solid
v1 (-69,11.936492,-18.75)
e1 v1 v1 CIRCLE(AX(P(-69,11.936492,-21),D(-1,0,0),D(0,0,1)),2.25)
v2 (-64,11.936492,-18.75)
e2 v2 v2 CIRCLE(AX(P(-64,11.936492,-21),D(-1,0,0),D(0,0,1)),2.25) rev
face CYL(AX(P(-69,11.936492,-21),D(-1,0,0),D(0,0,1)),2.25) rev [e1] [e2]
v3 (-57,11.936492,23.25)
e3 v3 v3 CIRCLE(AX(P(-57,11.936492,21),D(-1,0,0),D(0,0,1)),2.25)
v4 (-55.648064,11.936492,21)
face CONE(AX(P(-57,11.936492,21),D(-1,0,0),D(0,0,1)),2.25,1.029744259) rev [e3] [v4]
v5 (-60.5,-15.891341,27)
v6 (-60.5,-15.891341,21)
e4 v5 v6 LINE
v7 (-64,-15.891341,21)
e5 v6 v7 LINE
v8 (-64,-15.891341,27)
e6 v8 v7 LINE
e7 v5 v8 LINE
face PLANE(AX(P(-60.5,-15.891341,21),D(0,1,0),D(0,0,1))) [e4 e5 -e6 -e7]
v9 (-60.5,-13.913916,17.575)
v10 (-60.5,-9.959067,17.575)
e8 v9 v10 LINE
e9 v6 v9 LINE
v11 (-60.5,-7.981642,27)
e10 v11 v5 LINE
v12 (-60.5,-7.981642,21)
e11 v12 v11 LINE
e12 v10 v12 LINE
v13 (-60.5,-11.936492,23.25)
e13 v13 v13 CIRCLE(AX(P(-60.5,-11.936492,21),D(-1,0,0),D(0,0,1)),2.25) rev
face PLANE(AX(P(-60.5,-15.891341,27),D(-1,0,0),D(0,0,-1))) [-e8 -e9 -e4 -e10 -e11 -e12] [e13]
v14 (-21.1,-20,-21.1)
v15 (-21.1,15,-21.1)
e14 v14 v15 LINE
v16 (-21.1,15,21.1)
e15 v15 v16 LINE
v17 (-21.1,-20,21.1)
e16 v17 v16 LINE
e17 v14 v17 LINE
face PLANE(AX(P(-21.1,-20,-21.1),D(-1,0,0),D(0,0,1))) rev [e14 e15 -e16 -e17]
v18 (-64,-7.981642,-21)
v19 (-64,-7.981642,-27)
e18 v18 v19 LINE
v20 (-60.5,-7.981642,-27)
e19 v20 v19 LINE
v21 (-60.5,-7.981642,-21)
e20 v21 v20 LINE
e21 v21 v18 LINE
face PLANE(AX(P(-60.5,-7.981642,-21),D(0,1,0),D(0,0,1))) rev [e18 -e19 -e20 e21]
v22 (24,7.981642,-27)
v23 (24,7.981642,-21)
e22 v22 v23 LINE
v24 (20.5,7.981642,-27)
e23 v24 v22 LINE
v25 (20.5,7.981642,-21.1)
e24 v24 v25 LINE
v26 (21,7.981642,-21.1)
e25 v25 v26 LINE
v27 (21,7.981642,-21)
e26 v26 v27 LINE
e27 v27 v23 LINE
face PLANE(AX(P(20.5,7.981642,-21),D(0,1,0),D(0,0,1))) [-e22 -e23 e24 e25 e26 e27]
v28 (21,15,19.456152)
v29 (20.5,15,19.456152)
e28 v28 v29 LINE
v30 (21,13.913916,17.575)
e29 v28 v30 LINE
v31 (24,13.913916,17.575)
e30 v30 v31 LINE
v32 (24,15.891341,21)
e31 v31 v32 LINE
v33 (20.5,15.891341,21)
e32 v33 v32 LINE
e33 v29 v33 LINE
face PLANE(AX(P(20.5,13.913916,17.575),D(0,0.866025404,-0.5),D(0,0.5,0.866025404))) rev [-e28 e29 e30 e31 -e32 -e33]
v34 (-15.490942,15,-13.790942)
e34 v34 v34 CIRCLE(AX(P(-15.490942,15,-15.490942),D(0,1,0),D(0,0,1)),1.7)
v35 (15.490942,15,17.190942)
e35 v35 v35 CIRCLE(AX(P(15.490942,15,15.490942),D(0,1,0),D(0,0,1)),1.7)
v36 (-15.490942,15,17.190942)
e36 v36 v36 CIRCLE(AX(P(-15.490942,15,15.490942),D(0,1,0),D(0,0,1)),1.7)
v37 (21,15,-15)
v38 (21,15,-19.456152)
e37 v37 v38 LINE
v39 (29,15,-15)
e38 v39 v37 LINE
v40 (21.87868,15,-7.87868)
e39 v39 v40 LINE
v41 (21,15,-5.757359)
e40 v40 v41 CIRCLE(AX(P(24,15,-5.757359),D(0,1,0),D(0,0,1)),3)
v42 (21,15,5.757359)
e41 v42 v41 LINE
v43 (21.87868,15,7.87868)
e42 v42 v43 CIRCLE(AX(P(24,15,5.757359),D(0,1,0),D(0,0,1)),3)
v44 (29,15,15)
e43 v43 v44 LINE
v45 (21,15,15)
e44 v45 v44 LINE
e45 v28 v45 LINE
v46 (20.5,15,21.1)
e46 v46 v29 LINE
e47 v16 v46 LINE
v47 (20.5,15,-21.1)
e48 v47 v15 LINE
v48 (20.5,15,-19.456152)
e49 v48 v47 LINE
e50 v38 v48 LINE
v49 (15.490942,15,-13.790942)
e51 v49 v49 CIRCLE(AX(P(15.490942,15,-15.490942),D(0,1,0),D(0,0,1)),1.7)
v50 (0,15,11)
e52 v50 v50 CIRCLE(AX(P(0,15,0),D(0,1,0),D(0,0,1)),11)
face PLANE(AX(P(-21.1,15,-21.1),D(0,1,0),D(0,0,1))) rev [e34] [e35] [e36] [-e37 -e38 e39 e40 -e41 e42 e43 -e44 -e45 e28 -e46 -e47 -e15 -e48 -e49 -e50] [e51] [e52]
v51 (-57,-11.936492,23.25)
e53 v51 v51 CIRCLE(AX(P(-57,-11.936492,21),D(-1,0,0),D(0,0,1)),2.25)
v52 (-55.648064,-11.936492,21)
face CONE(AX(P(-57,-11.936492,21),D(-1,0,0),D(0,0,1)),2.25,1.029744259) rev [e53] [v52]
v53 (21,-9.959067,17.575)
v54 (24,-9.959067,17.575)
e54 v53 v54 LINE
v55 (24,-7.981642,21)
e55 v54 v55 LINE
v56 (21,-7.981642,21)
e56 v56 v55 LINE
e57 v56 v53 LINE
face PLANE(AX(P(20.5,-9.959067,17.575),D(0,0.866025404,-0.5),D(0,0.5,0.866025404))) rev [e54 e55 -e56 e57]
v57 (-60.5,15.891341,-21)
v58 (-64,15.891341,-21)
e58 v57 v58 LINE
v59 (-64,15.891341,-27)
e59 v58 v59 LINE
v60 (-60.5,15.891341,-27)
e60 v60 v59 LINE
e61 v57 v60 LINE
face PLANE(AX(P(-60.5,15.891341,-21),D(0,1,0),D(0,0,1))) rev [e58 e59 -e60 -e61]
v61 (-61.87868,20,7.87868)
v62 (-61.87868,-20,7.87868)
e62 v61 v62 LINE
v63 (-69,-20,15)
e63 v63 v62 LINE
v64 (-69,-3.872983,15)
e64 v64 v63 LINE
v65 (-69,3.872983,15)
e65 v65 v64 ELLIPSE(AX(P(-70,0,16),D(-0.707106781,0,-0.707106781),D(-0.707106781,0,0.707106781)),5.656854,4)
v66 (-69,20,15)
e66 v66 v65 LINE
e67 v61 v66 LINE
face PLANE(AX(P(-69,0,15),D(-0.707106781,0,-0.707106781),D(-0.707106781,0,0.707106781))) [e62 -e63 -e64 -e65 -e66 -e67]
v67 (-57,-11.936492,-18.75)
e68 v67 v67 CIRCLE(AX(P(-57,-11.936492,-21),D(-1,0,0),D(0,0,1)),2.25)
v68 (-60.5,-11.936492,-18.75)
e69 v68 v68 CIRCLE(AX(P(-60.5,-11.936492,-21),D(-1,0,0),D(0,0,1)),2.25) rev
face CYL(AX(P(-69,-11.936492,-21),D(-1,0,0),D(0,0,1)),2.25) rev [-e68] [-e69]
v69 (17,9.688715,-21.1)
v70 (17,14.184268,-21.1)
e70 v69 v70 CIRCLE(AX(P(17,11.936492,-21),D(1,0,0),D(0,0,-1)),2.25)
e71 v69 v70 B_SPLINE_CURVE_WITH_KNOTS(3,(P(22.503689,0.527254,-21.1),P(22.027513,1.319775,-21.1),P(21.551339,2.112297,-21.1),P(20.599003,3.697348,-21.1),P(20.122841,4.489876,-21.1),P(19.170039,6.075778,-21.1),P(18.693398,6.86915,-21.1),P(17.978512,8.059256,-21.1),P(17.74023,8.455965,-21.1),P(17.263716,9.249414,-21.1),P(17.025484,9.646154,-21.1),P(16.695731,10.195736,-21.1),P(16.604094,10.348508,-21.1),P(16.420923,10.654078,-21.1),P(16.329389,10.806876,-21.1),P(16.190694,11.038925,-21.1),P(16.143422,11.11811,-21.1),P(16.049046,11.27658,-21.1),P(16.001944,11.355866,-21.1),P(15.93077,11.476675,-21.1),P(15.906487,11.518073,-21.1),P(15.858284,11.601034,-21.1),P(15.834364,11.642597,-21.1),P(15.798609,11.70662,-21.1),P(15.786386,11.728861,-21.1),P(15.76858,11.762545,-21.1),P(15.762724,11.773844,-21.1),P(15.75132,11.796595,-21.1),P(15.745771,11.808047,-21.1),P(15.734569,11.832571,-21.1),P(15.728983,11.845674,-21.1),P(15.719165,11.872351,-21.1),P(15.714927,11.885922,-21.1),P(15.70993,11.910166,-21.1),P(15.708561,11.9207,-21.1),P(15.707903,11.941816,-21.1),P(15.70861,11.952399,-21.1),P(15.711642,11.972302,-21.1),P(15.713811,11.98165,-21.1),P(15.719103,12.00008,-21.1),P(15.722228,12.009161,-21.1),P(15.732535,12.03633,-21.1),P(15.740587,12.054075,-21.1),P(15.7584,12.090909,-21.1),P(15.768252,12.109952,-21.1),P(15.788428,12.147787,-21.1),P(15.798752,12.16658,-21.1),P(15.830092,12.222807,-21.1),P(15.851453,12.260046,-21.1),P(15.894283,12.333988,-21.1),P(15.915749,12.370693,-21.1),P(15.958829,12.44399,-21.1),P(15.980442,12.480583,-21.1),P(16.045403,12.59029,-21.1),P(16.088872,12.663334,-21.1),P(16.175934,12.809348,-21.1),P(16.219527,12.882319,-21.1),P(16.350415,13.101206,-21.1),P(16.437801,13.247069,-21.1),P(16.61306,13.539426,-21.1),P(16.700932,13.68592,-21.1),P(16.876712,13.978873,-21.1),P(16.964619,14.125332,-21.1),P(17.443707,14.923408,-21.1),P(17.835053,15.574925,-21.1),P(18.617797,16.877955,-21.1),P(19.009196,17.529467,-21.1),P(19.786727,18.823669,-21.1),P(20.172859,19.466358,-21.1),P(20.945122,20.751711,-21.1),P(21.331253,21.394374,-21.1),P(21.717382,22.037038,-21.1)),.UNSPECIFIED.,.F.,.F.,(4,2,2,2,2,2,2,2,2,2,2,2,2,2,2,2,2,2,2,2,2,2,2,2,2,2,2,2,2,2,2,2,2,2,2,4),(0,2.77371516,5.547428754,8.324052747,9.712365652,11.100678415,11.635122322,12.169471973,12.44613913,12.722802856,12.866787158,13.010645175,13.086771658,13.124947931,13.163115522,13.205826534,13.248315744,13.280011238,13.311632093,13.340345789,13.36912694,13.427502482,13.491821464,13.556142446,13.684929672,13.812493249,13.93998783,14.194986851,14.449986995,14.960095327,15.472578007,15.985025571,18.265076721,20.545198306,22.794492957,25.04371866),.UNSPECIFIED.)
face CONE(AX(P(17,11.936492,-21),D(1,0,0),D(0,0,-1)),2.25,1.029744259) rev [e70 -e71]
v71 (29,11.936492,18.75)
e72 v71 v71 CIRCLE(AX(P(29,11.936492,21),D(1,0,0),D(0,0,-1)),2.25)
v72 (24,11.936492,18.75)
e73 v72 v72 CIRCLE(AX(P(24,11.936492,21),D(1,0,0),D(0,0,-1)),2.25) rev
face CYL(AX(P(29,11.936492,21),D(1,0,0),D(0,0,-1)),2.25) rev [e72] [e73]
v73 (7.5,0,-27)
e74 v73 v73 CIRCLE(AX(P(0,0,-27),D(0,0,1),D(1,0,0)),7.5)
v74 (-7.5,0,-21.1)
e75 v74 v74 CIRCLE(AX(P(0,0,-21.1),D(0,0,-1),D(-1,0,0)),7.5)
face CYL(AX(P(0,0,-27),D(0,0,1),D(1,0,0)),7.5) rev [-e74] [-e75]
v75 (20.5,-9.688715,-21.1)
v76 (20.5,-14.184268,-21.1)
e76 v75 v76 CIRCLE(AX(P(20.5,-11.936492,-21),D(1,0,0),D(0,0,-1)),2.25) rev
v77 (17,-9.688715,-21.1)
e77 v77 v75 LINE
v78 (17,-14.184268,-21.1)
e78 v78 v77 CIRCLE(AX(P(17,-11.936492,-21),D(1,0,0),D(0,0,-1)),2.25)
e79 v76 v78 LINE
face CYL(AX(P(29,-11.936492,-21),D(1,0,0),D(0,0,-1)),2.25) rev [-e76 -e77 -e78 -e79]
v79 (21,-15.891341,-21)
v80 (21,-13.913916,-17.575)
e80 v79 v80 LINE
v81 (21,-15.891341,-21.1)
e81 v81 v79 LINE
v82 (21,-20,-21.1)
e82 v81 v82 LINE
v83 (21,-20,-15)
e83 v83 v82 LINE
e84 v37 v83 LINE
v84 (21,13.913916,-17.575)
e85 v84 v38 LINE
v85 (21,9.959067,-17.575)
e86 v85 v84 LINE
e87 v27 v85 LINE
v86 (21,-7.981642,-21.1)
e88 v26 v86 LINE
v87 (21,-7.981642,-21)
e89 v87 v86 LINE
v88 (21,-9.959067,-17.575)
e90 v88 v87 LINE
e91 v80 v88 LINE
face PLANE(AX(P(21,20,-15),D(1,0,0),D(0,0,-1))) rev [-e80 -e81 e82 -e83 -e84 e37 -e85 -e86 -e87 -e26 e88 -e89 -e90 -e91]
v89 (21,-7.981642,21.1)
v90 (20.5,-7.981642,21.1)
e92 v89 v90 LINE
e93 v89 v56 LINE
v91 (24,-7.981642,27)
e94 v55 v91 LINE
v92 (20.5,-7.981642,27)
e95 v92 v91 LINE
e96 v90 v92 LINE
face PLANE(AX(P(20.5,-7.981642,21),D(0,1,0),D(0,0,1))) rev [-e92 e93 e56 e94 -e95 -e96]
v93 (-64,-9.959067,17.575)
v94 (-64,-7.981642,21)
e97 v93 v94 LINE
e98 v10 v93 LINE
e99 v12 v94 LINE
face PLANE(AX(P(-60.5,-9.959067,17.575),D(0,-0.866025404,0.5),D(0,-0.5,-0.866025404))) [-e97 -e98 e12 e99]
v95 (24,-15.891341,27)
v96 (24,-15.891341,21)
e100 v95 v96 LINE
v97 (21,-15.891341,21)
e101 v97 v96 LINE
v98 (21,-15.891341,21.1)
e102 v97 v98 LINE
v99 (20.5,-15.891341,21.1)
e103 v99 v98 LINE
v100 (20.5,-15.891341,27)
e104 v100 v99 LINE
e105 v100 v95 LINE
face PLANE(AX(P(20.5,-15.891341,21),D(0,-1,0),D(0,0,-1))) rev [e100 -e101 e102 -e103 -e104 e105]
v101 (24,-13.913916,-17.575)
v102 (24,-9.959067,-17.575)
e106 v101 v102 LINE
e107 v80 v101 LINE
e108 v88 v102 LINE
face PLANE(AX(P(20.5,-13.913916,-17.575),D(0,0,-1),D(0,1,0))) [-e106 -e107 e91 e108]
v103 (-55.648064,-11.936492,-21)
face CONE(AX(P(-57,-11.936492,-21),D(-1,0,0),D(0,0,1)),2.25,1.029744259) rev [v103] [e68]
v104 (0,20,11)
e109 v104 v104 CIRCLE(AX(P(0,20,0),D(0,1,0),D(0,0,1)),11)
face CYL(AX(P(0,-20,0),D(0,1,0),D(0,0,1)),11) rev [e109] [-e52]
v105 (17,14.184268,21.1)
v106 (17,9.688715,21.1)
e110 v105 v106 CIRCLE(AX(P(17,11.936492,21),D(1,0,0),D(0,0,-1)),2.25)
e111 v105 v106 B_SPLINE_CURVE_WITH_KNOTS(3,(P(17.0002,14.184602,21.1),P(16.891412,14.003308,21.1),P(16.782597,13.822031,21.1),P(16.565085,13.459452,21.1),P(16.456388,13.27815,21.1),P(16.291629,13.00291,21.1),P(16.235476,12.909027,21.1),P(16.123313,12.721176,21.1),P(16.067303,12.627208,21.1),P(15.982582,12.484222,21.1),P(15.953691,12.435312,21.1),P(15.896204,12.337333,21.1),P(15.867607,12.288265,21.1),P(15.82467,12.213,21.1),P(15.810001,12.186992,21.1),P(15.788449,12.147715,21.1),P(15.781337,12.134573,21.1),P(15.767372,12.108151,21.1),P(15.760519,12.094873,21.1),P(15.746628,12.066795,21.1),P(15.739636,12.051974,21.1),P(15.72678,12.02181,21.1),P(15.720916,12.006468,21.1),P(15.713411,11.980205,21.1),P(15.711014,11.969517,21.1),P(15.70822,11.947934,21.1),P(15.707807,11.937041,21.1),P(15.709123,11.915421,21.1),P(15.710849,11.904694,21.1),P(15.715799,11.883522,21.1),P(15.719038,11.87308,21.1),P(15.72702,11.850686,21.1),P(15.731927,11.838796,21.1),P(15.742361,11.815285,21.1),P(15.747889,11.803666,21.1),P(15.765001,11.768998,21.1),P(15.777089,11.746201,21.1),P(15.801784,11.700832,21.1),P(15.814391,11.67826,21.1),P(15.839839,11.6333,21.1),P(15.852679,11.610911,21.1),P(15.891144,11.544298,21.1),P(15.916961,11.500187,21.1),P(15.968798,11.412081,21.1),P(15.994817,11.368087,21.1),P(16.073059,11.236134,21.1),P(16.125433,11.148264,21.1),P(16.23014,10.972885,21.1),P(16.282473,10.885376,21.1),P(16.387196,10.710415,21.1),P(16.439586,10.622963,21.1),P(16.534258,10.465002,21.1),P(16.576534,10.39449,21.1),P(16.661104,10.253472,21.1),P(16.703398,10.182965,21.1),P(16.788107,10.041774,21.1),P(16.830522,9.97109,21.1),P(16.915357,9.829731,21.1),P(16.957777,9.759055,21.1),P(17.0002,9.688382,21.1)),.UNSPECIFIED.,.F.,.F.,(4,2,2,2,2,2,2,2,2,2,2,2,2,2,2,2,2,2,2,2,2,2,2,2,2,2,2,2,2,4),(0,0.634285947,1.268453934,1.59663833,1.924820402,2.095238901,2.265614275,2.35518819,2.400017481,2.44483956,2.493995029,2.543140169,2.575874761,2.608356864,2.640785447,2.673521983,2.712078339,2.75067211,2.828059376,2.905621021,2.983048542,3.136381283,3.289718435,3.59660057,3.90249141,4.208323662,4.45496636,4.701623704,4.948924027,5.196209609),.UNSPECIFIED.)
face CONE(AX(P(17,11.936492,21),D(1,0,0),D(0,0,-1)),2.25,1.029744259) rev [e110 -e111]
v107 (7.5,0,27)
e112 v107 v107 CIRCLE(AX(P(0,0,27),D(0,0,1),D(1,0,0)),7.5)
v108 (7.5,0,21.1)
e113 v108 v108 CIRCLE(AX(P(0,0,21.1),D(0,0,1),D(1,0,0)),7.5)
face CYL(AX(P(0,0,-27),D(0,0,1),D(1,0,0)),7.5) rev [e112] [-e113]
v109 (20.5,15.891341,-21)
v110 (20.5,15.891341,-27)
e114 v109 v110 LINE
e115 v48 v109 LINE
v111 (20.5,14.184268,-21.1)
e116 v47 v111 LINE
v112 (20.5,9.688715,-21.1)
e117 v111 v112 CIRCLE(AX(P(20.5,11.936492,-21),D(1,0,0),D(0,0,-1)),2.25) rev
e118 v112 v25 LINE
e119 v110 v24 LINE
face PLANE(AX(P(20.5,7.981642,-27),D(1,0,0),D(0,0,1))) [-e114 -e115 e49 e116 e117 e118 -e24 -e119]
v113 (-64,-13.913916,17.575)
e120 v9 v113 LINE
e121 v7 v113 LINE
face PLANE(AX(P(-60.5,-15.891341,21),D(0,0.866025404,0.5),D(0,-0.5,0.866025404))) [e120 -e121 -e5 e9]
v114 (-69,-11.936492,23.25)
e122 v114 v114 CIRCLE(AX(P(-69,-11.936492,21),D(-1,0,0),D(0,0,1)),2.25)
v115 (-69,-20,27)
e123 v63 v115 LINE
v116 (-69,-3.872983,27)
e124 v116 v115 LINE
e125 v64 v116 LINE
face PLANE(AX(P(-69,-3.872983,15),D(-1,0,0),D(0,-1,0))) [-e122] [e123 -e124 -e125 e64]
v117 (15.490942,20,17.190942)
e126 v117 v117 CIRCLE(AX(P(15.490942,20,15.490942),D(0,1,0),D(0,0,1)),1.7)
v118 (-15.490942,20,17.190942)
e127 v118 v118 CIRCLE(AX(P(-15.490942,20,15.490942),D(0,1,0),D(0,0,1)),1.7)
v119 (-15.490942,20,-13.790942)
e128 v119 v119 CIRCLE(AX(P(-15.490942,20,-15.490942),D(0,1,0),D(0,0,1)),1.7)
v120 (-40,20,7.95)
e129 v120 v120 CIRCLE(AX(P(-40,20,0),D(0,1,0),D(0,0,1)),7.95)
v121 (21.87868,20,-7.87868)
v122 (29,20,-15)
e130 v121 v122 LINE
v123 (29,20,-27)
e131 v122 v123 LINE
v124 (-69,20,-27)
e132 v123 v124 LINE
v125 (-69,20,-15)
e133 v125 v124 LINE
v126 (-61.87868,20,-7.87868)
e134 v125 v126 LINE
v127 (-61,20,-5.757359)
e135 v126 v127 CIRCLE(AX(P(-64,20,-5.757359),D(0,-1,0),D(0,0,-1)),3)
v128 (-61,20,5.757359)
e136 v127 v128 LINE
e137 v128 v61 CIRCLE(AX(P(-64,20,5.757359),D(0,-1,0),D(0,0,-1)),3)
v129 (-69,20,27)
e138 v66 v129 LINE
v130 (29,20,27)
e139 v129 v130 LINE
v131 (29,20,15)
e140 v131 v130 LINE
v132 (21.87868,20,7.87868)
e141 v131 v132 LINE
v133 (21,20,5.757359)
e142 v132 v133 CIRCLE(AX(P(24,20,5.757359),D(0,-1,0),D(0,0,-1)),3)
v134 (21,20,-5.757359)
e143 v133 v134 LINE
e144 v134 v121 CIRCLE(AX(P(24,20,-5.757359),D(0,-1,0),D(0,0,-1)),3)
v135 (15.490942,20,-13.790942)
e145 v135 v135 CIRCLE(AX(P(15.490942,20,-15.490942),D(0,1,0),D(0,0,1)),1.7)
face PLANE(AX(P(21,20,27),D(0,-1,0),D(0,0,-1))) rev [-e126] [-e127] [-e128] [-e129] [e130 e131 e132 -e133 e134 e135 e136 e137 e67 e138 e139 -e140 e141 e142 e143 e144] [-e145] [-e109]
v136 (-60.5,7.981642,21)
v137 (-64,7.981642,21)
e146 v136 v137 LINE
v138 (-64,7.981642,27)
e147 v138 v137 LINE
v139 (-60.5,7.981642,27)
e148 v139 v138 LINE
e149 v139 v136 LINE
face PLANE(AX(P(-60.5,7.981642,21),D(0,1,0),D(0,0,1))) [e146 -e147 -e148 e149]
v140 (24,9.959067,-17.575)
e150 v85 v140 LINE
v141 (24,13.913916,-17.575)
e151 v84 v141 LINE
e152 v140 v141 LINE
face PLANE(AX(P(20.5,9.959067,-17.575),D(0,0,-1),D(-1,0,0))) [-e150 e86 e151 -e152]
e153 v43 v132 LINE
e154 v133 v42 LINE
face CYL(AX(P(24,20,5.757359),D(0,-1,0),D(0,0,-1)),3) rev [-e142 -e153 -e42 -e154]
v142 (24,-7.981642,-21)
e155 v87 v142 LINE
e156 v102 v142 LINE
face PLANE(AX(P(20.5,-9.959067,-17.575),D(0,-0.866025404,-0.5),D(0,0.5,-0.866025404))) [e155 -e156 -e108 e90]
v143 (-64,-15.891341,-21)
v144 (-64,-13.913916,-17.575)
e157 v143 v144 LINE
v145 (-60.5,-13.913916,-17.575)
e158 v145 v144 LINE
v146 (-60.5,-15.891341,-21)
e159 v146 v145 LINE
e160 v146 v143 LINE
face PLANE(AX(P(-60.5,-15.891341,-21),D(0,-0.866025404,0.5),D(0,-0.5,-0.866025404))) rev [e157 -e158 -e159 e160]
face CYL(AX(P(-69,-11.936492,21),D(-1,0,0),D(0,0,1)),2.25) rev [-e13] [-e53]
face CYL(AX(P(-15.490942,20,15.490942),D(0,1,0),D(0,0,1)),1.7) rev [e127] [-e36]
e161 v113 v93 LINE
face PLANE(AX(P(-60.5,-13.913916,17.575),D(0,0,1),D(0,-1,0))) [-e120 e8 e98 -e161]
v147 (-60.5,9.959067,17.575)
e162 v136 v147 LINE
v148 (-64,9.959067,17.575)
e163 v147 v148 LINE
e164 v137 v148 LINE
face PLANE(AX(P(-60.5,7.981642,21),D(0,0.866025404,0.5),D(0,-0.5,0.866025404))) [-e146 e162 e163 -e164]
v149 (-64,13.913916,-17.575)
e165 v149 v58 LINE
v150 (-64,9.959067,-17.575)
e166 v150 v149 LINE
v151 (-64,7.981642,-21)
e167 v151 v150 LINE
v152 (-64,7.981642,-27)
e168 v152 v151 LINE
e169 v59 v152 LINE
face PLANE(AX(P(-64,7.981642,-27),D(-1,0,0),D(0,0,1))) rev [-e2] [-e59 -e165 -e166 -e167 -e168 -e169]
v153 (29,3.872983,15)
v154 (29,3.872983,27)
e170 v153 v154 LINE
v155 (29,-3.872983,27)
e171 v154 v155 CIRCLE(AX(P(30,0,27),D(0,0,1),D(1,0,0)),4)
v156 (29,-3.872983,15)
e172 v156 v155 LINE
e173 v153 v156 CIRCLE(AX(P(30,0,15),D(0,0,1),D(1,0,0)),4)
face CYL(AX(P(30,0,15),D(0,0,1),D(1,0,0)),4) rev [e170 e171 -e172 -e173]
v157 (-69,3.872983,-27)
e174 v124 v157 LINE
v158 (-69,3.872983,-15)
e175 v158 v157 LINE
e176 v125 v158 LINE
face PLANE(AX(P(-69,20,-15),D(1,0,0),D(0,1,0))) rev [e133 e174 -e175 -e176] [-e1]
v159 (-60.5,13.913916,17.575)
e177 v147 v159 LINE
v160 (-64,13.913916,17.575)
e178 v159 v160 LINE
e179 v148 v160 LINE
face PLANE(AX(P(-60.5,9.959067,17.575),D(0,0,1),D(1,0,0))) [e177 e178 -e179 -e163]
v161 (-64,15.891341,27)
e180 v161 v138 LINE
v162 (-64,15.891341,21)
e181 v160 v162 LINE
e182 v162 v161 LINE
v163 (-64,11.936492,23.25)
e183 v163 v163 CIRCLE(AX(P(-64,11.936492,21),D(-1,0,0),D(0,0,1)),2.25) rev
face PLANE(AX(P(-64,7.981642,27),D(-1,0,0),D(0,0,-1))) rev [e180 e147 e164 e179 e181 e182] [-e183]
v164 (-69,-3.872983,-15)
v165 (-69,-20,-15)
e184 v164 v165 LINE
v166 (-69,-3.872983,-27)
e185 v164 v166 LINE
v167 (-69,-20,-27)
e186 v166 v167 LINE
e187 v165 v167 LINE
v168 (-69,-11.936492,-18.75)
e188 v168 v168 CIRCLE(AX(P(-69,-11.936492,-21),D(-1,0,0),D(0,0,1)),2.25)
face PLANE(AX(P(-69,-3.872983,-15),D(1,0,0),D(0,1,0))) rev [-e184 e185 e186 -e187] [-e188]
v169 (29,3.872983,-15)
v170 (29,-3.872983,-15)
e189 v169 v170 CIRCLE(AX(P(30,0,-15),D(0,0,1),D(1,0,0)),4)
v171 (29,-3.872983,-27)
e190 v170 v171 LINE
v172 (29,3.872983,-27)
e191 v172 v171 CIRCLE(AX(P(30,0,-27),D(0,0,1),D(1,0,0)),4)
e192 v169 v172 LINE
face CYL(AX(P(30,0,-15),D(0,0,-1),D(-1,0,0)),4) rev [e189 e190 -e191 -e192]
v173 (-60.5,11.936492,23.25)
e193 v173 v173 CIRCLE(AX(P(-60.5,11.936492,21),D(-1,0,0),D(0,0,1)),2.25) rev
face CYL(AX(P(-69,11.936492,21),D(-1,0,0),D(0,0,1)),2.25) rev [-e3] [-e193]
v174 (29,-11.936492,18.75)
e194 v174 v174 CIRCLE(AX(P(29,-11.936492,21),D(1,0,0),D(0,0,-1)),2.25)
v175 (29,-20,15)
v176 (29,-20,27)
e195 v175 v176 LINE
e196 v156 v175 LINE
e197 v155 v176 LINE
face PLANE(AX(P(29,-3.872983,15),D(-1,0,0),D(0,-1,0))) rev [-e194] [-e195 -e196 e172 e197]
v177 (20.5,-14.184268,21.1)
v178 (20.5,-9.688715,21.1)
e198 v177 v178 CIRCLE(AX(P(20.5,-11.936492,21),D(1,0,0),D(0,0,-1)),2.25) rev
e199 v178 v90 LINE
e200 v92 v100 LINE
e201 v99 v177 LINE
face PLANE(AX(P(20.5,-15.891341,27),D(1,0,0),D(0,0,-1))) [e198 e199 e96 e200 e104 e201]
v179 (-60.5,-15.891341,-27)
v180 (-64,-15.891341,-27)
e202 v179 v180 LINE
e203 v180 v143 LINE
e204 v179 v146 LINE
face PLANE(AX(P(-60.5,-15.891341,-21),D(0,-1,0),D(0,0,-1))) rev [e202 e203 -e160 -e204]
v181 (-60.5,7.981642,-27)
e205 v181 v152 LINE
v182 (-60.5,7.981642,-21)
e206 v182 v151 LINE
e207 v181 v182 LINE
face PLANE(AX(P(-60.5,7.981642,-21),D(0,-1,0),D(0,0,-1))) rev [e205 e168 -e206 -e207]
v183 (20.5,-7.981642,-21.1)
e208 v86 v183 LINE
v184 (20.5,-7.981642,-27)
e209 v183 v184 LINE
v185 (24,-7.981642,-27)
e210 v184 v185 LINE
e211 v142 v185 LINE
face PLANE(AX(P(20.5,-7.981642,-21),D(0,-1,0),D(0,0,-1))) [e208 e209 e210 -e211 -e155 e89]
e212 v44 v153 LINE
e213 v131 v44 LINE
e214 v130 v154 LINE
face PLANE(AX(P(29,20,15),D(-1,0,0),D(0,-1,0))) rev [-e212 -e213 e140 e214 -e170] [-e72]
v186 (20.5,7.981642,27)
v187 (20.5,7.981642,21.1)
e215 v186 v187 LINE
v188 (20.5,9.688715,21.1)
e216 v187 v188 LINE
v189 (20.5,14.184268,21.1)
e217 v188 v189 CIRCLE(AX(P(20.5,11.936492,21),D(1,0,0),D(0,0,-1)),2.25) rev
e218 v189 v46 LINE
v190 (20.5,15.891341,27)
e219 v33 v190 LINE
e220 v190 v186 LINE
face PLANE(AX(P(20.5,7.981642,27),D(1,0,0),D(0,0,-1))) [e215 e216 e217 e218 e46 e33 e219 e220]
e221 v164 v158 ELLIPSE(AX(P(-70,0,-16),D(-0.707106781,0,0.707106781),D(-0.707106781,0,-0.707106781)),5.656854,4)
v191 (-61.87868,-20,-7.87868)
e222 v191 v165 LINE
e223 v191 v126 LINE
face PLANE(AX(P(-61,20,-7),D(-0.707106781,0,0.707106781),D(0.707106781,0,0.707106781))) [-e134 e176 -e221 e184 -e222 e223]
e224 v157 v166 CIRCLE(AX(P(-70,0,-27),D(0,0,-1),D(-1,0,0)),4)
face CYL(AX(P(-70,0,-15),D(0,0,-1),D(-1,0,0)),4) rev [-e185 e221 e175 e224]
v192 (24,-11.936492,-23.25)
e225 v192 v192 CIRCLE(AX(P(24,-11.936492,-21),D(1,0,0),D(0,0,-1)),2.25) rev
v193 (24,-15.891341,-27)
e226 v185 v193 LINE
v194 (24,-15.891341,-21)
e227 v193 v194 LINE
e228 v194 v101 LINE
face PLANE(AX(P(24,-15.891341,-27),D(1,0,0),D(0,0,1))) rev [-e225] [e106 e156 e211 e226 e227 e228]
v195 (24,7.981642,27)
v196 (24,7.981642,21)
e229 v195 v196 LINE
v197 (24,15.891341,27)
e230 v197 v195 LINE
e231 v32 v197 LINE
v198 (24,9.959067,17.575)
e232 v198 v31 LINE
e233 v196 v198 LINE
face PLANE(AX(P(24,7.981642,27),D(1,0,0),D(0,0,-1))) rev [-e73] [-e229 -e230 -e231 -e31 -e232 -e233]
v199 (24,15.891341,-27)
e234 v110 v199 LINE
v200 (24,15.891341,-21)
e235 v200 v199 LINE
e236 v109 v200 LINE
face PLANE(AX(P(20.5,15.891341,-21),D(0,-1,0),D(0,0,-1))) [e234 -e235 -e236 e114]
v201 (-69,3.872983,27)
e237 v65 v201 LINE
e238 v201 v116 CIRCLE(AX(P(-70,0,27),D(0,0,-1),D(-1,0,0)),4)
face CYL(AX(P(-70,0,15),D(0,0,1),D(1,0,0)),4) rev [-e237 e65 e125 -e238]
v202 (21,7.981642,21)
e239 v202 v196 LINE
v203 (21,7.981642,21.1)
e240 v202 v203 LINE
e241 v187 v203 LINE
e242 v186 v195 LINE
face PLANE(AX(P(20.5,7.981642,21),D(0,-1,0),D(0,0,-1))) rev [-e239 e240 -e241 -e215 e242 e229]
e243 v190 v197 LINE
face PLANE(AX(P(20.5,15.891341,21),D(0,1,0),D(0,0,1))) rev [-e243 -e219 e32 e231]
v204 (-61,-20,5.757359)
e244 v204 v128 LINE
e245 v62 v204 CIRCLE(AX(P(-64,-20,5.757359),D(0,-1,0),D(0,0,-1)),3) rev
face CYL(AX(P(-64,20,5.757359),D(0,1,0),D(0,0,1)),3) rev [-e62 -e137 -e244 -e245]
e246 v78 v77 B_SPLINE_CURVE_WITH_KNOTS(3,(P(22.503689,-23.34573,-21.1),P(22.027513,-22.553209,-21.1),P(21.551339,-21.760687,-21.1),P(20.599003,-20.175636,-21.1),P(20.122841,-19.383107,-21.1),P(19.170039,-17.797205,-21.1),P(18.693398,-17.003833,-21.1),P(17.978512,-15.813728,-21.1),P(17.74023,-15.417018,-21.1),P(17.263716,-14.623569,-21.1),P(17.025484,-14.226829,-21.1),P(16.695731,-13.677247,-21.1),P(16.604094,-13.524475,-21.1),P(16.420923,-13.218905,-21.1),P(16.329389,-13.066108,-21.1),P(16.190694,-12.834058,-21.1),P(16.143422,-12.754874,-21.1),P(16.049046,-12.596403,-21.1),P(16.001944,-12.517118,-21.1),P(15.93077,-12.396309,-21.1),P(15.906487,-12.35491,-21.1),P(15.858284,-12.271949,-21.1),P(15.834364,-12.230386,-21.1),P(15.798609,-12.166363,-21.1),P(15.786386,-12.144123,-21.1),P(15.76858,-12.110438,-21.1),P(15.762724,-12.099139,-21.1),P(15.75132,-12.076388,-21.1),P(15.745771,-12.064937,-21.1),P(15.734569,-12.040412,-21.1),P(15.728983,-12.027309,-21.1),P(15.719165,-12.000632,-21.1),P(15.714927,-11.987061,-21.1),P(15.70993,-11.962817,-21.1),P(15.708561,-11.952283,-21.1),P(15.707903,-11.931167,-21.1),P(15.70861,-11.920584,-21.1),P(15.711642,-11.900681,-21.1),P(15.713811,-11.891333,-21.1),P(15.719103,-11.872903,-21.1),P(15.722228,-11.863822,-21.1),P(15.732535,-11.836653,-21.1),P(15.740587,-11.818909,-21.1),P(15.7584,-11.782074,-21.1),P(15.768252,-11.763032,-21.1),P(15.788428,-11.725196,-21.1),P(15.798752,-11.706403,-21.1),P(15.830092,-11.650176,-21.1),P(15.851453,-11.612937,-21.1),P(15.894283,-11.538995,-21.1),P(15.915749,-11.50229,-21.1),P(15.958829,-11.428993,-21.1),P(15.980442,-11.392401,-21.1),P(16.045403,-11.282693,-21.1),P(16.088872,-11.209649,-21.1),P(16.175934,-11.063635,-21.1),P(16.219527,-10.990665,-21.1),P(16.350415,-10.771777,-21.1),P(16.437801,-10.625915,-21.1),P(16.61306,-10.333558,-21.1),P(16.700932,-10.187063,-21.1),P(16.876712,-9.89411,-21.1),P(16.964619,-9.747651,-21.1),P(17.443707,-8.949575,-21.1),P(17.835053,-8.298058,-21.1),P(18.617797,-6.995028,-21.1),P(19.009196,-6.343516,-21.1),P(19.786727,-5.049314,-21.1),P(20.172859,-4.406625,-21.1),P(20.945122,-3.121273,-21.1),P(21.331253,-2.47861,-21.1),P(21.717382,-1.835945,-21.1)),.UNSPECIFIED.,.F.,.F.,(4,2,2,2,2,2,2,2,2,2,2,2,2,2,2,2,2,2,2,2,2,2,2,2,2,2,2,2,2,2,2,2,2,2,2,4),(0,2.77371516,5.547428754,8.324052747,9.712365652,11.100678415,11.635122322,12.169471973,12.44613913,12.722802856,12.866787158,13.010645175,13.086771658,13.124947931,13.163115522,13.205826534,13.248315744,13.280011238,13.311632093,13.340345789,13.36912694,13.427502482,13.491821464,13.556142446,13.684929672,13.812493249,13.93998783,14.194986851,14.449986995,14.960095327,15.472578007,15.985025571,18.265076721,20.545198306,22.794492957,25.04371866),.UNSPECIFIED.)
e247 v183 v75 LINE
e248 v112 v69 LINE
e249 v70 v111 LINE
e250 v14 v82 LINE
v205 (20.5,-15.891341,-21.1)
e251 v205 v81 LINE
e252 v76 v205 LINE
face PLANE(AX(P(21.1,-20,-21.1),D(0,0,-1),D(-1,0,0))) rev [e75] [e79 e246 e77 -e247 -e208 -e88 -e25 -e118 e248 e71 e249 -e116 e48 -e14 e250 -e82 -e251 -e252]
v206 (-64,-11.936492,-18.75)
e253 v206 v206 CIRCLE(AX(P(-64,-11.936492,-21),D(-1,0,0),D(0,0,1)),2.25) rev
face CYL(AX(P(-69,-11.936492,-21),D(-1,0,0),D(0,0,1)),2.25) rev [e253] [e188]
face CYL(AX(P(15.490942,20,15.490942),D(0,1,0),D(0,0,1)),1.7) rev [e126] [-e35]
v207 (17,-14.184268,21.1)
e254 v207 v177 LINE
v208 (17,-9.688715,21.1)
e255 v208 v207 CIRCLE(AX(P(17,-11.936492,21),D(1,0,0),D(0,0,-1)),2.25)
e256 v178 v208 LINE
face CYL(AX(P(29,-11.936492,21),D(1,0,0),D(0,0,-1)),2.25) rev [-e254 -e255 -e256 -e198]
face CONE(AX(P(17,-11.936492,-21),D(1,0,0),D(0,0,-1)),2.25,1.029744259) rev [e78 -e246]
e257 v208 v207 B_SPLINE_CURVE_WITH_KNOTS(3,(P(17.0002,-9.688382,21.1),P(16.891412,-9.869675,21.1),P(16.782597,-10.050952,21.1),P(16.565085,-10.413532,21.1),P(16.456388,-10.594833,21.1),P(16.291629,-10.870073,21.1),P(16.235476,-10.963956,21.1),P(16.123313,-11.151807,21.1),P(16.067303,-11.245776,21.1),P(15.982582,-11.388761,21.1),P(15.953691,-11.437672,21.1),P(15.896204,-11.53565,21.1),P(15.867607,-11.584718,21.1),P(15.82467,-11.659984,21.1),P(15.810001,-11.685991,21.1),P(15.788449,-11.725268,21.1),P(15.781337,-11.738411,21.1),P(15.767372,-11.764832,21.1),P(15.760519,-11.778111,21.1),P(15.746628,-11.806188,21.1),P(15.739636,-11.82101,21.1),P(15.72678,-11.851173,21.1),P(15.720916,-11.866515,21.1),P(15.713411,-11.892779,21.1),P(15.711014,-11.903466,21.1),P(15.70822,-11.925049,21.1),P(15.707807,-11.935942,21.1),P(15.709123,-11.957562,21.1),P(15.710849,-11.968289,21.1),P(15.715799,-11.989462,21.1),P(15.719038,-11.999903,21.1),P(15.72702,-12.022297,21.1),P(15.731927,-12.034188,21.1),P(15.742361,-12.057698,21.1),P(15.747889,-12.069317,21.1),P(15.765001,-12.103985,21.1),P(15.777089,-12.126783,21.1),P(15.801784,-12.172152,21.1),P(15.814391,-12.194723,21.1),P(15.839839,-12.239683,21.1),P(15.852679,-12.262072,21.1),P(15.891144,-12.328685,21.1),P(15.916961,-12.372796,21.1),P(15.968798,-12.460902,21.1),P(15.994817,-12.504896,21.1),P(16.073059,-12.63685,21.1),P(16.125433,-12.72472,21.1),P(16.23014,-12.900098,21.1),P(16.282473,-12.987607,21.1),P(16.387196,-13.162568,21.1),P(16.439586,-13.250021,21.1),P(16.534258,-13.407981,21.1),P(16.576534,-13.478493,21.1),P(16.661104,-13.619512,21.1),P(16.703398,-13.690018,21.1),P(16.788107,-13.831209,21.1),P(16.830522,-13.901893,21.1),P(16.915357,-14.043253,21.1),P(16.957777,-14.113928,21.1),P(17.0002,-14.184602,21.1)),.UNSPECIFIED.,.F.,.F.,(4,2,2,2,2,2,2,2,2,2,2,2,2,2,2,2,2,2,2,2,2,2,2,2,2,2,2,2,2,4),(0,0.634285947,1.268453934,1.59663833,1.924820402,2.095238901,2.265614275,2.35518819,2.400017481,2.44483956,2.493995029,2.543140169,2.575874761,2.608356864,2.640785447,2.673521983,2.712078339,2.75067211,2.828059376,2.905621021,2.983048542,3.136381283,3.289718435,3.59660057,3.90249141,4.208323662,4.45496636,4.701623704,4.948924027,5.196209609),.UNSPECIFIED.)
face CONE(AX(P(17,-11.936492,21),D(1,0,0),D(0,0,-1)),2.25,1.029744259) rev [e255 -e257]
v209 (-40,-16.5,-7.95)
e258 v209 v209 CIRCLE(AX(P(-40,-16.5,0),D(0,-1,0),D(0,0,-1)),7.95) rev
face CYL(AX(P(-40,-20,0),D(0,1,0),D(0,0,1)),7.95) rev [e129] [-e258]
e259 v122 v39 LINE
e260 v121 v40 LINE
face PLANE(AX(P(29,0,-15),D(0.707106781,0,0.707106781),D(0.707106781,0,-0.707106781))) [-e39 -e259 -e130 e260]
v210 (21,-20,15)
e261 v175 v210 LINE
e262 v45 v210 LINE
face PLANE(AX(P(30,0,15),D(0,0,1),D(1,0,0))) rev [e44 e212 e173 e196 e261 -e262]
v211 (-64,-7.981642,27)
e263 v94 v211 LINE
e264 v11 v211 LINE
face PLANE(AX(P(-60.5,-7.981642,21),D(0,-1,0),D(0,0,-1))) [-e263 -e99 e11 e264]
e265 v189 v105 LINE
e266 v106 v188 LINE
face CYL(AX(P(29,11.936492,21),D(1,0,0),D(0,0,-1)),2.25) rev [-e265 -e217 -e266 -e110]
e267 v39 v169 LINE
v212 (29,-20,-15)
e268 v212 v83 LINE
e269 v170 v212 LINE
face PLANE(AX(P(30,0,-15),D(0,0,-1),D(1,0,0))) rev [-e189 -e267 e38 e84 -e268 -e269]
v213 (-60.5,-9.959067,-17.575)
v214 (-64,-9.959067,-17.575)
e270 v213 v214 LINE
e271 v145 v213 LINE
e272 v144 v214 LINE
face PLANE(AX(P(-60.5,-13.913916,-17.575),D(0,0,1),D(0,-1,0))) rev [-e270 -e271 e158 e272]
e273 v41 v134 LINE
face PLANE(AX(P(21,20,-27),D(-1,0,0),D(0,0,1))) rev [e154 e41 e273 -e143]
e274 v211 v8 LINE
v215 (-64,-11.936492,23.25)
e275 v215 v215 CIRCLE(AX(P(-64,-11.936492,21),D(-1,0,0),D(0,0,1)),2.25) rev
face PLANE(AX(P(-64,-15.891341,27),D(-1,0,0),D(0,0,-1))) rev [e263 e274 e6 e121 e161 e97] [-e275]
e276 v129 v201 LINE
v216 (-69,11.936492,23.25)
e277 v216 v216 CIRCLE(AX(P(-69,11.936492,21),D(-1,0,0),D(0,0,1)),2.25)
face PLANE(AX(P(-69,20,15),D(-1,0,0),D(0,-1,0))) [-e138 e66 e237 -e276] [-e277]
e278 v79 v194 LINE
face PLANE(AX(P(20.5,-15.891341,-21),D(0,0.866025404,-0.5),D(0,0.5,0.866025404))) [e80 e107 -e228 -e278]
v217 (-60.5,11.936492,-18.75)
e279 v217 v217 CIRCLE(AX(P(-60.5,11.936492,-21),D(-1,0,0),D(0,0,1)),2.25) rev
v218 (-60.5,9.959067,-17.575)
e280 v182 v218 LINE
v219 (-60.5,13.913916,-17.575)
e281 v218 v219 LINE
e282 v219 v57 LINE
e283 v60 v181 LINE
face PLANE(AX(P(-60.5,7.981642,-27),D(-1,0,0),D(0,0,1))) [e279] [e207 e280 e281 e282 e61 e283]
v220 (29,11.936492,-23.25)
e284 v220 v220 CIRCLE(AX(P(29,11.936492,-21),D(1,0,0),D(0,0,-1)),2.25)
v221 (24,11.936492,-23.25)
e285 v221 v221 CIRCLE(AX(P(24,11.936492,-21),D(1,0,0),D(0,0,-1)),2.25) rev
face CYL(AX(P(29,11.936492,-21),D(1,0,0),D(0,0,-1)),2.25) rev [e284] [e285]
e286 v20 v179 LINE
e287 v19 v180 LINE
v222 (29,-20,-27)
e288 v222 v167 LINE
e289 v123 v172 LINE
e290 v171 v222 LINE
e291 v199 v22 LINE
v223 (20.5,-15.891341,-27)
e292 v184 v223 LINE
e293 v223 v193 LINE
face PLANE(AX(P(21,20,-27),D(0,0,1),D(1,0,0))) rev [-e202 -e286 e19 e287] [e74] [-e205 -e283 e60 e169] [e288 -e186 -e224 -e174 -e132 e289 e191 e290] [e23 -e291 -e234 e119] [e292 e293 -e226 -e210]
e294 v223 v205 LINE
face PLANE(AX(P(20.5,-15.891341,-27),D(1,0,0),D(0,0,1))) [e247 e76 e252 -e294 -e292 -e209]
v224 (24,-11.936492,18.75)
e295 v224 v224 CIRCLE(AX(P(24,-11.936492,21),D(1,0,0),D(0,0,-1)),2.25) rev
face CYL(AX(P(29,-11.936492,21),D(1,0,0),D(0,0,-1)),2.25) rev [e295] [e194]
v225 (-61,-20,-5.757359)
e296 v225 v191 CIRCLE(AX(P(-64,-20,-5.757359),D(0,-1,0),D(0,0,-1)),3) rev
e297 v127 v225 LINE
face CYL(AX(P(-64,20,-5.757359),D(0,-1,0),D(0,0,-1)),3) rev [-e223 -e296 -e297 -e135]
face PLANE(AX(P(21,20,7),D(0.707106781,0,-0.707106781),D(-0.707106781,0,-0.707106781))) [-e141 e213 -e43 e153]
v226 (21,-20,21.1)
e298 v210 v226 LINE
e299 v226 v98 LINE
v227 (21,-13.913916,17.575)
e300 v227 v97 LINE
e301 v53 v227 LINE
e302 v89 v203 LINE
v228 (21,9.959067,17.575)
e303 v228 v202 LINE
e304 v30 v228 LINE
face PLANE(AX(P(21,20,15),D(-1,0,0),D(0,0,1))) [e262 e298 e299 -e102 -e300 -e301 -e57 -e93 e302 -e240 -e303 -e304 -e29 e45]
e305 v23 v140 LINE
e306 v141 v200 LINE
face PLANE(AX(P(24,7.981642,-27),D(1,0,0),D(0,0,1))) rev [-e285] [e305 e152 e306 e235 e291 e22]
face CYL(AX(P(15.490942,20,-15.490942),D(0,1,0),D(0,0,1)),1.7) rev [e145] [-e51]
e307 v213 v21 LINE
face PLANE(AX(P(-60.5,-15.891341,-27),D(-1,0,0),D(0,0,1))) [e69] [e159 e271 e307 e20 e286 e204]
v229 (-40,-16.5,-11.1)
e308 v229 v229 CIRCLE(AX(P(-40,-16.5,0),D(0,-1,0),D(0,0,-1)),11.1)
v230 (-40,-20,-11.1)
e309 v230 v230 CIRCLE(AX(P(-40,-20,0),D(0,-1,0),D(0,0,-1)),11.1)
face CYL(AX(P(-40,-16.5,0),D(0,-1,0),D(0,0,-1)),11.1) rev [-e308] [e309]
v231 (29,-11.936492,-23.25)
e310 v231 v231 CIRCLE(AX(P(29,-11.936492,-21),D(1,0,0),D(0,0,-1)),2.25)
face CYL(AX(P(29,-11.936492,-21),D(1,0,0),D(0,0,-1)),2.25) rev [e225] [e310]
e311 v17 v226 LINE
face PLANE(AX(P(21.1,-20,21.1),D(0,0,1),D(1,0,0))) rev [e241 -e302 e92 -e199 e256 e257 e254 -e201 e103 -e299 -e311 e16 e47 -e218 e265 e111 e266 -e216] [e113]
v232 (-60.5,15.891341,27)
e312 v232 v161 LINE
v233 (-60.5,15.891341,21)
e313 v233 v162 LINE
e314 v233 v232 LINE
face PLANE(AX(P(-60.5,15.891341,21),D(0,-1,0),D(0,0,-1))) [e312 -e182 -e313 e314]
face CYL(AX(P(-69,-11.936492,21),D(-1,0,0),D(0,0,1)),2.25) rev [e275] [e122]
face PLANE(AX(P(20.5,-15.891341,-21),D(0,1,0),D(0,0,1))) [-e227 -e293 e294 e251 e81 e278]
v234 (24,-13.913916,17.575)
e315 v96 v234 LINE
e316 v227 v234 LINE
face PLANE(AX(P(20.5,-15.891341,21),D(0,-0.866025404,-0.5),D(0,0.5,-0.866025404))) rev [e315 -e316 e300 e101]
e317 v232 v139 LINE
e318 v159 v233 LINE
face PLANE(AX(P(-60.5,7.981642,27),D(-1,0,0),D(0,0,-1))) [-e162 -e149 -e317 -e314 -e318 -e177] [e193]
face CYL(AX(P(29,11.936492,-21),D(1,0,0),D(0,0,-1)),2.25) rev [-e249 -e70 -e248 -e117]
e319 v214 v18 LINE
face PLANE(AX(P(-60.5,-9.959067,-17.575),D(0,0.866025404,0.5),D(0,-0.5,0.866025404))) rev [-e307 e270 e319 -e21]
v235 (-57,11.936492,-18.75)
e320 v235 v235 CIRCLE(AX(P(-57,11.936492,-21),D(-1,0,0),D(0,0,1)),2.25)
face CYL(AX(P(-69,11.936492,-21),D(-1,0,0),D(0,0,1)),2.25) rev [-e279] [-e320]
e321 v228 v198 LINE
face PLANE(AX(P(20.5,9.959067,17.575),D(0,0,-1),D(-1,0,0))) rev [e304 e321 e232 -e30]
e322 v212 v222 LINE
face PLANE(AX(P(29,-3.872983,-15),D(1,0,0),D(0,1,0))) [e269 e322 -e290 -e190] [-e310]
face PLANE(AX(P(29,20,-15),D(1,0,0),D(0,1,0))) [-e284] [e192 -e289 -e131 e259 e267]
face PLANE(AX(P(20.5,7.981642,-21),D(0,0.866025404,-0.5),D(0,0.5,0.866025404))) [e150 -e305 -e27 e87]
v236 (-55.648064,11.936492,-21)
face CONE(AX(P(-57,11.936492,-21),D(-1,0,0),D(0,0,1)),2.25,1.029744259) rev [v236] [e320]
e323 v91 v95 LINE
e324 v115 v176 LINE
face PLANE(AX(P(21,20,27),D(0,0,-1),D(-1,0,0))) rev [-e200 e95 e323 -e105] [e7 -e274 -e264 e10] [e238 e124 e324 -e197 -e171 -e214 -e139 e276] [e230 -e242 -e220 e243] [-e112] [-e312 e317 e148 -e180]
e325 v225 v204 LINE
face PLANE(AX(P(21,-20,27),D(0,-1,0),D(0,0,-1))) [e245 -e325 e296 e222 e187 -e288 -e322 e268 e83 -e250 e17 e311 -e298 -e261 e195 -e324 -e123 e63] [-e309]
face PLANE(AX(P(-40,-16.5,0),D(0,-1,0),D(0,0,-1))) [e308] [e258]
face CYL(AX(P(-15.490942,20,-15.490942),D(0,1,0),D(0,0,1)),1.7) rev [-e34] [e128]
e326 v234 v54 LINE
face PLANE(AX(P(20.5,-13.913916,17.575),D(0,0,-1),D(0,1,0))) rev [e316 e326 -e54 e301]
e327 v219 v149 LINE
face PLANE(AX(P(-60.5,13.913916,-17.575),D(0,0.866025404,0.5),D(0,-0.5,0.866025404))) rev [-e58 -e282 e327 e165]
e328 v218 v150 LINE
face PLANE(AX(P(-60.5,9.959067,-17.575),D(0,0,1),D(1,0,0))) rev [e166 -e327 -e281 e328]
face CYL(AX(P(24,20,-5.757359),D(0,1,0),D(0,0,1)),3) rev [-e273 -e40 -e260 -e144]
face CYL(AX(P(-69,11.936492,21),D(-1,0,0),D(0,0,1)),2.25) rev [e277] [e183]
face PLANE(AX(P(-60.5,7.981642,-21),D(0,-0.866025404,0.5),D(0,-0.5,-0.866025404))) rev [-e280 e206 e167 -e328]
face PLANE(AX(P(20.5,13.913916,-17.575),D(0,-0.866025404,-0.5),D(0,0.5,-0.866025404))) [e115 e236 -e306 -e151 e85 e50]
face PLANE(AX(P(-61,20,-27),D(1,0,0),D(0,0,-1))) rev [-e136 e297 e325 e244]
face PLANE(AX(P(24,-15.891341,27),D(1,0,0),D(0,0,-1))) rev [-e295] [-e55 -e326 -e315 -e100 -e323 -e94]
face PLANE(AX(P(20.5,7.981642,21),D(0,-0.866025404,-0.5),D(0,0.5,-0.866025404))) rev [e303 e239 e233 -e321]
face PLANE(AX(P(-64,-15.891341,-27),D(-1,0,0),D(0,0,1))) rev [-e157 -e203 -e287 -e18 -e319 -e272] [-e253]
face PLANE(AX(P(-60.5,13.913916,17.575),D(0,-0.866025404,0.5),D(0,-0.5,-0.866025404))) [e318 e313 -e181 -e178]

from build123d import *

# Parameters (mm, degrees)
SKETCH3_W                           = 82
SKETCH3_H                           = 54
BOSS_EXTRUDE2_DEPTH                 = 20
MOTOR_START                         = -5
SKETCH6_W                           = 42.2
SKETCH6_H                           = 42.2
MOTOR_POCKET_DEPTH                  = 73.781745931
SKETCH7_R                           = 11
MOTOR_PILOT_HOLE_DEPTH              = 78.781745931
M3_CLEARANCE_HOLE1_MOTOR_MOUNTING_D = 3.4
SKETCH12_R                          = 7.95
CUT_EXTRUDE4_DEPTH                  = 78.781745931
SKETCH14_R                          = 11.1
SLEEVE_BEARING_RECESS_DEPTH         = 3.5
SKETCH15_R                          = 7.5
CUT_EXTRUDE7_DEPTH                  = 84.886828525
BOSS_EXTRUDE8_START                 = 27
BOSS_EXTRUDE8_DEPTH                 = 12
MIRROR6_START                       = 27
MIRROR6_COPY_1_DEPTH                = 12
M4_CLEARANCE_HOLE1_AT_2_COUNT       = 2
M4_CLEARANCE_HOLE1_AT_2_PITCH       = 23.872983346
CLAMP_START                         = -5
CLAMP_NUT_POCKETS_DEPTH             = 3.5
MIRROR8_START                       = -5
MIRROR8_COPY_3_DEPTH                = 3.5
CHAMFER3_SIZE                       = 8
FILLET8_R                           = 3


with BuildPart() as part:
    # Sketch3 → Boss-Extrude2 (new, symmetric)
    with BuildSketch(Plane(origin=(0, 0, 0), x_dir=(1, 0, 0), z_dir=(0, 1, 0))):
        with Locations((-20, 0)):
            Rectangle(SKETCH3_W, SKETCH3_H)
    extrude(amount=BOSS_EXTRUDE2_DEPTH, both=True)

    # Sketch6 → Motor Pocket (cut, through all)
    with BuildSketch(Plane(origin=(0, 20, 0), x_dir=(1, 0, 0), z_dir=(0, 1, 0)).offset(MOTOR_START)):
        Rectangle(SKETCH6_W, SKETCH6_H)
    extrude(amount=-MOTOR_POCKET_DEPTH, mode=Mode.SUBTRACT)

    # Sketch7 → Motor Pilot Hole (cut, through all)
    with BuildSketch(Plane(origin=(0, 20, 0), x_dir=(1, 0, 0), z_dir=(0, 1, 0))):
        with Locations(Location((0, 0, 0), (0, 0, 270))):
            Circle(SKETCH7_R)
    extrude(amount=-MOTOR_PILOT_HOLE_DEPTH, mode=Mode.SUBTRACT)

    # M3 Clearance Hole1 - Motor Mounting (through all)
    with Locations(Plane(origin=(0, 20, 0), x_dir=(-1, 0, 0), z_dir=(0, 1, 0))):
        with Locations((15.490941809, 15.490941809), (-15.490941809, -15.490941809), (15.490941809, -15.490941809), (-15.490941809, 15.490941809)):
            Hole(M3_CLEARANCE_HOLE1_MOTOR_MOUNTING_D / 2)

    # Sketch12 → Cut-Extrude4 (cut, through all)
    with BuildSketch(Plane(origin=(0, 20, 0), x_dir=(1, 0, 0), z_dir=(0, 1, 0))):
        with Locations(Location((-40, 0, 0), (0, 0, 270))):
            Circle(SKETCH12_R)
    extrude(amount=-CUT_EXTRUDE4_DEPTH, mode=Mode.SUBTRACT)

    # Sketch14 → Sleeve Bearing Recess (cut)
    with BuildSketch(Plane.XZ.offset(20)):
        with Locations(Location((-40, 0, 0), (0, 0, 270))):
            Circle(SKETCH14_R)
    extrude(amount=-SLEEVE_BEARING_RECESS_DEPTH, mode=Mode.SUBTRACT)

    # Sketch15 → Cut-Extrude7 (cut, through all)
    with BuildSketch(Plane.XY.offset(27)):
        Circle(SKETCH15_R)
    extrude(amount=-CUT_EXTRUDE7_DEPTH, mode=Mode.SUBTRACT)

    # Sketch16 → Boss-Extrude8 (add)
    with BuildSketch(Plane.XY.offset(BOSS_EXTRUDE8_START)):
        with BuildLine():
            Line((21, 20), (21, -20))
            Line((21, -20), (29, -20))
            Line((29, -20), (29, -3.872983346))
            ThreePointArc((29, -3.872983346), (26, 0), (29, 3.872983346))
            Line((29, 3.872983346), (29, 20))
            Line((29, 20), (21, 20))
        make_face()
    boss_extrude8 = extrude(amount=-BOSS_EXTRUDE8_DEPTH)

    # Mirror5: Boss-Extrude8 across plane
    add(boss_extrude8.mirror(Plane.XY))

    # Mirror6: Boss-Extrude8 across plane
    add(boss_extrude8.mirror(Plane(origin=(-20, 0, 0), x_dir=(0, 0, 1), z_dir=(1, 0, 0))))

    # Mirror6 copy 1 sketch → Mirror6 copy 1 (add)
    with BuildSketch(Plane(origin=(-40, 0, 0), x_dir=(-1, 0, 0), z_dir=(0, 0, -1)).offset(MIRROR6_START)):
        with BuildLine():
            Line((21, 20), (21, -20))
            Line((21, -20), (29, -20))
            Line((29, -20), (29, -3.872983346))
            ThreePointArc((29, -3.872983346), (26, 0), (29, 3.872983346))
            Line((29, 3.872983346), (29, 20))
            Line((29, 20), (21, 20))
        make_face()
    extrude(amount=-MIRROR6_COPY_1_DEPTH)

    # Sketch18 → M4 Clearance Hole1 (revolve, cut)
    with BuildSketch(Plane(origin=(29, 11.936491673, 21), x_dir=(0, 0, -1), z_dir=(0, 1, 0))):
        Polygon((0, 0), (0, 13.351936393), (2.25, 12), (2.25, 0), align=None)
    m4_clearance_hole1 = revolve(axis=Axis((35.35, 11.936491673, 21), (-1, 0, 0)), mode=Mode.SUBTRACT)

    # M4 Clearance Hole1 at 2: M4 Clearance Hole1 ×2
    with Locations(*[(0, -i * M4_CLEARANCE_HOLE1_AT_2_PITCH, 0) for i in range(1, M4_CLEARANCE_HOLE1_AT_2_COUNT)]):
        add(m4_clearance_hole1, mode=Mode.SUBTRACT)

    # Sketch17 → Clamp Nut Pockets (cut)
    with BuildSketch(Plane(origin=(29, 0, 0), x_dir=(0, 0, -1), z_dir=(1, 0, 0)).offset(CLAMP_START)):
        Polygon((-21, -7.981642329), (-27, -7.981642329), (-27, -15.891341017), (-21, -15.891341017), (-17.575, -13.913916345), (-17.575, -9.959067001), align=None)
        Polygon((-21, 7.981642329), (-17.575, 9.959067001), (-17.575, 13.913916345), (-21, 15.891341017), (-27, 15.891341017), (-27, 7.981642329), align=None)
    clamp_nut_pockets = extrude(amount=-CLAMP_NUT_POCKETS_DEPTH, mode=Mode.SUBTRACT)

    # Mirror7: M4 Clearance Hole1, Clamp Nut Pockets across plane
    add(m4_clearance_hole1.mirror(Plane.XY), mode=Mode.SUBTRACT)
    add(clamp_nut_pockets.mirror(Plane.XY), mode=Mode.SUBTRACT)

    # Mirror7 copy 1 sketch → Mirror7 copy 1 (revolve, cut)
    with BuildSketch(Plane(origin=(29, -11.936491673, -21), x_dir=(0, 0, 1), z_dir=(0, 1, 0))):
        Polygon((0, 0), (0, -13.351936393), (2.25, -12), (2.25, 0), align=None)
    revolve(axis=Axis((35.35, -11.936491673, -21), (1, 0, 0)), mode=Mode.SUBTRACT)

    # Mirror8: M4 Clearance Hole1, Clamp Nut Pockets across plane
    add(m4_clearance_hole1.mirror(Plane(origin=(-20, 0, 0), x_dir=(0, 0, 1), z_dir=(1, 0, 0))), mode=Mode.SUBTRACT)
    add(clamp_nut_pockets.mirror(Plane(origin=(-20, 0, 0), x_dir=(0, 0, 1), z_dir=(1, 0, 0))), mode=Mode.SUBTRACT)

    # Mirror8 copy 1 sketch → Mirror8 copy 1 (revolve, cut)
    with BuildSketch(Plane(origin=(-69, -11.936491673, 21), x_dir=(0, 0, -1), z_dir=(0, 1, 0))):
        Polygon((0, 0), (0, -13.351936393), (2.25, -12), (2.25, 0), align=None)
    revolve(axis=Axis((-75.35, -11.936491673, 21), (-1, 0, 0)), mode=Mode.SUBTRACT)

    # Mirror8 copy 2 sketch → Mirror8 copy 2 (revolve, cut)
    with BuildSketch(Plane(origin=(-69, 11.936491673, -21), x_dir=(0, 0, 1), z_dir=(0, 1, 0))):
        Polygon((0, 0), (0, 13.351936393), (2.25, 12), (2.25, 0), align=None)
    revolve(axis=Axis((-75.35, 11.936491673, -21), (1, 0, 0)), mode=Mode.SUBTRACT)

    # Mirror8 copy 3 sketch → Mirror8 copy 3 (cut)
    with BuildSketch(Plane.ZY.offset(69).offset(MIRROR8_START)):
        Polygon((-21, -7.981642329), (-27, -7.981642329), (-27, -15.891341017), (-21, -15.891341017), (-17.575, -13.913916345), (-17.575, -9.959067001), align=None)
        Polygon((-21, 7.981642329), (-17.575, 9.959067001), (-17.575, 13.913916345), (-21, 15.891341017), (-27, 15.891341017), (-27, 7.981642329), align=None)
    extrude(amount=-MIRROR8_COPY_3_DEPTH, mode=Mode.SUBTRACT)

    # Mirror8 copy 4 sketch → Mirror8 copy 4 (revolve, cut)
    with BuildSketch(Plane(origin=(-69, -11.936491673, -21), x_dir=(0, 0, 1), z_dir=(0, 1, 0))):
        Polygon((0, 0), (0, 13.351936393), (2.25, 12), (2.25, 0), align=None)
    revolve(axis=Axis((-75.35, -11.936491673, -21), (1, 0, 0)), mode=Mode.SUBTRACT)

    # Chamfer3
    # the kernel refuses this chamfer: 8 mm, written as the material it adds along each edge
    with BuildSketch(Plane(origin=(-61, 20, -15), x_dir=(-0.9996219169112968, 0, -0.027495876610586296), z_dir=(0, -1, 0))) as chamfer3_piece_1_section:
        Polygon((CHAMFER3_SIZE * 0.999621916911, -CHAMFER3_SIZE * 0.0274958766106), (-CHAMFER3_SIZE * 0.0274958766106, -CHAMFER3_SIZE * 0.999621916911), (0, 0), align=None)
    chamfer3_piece_1 = extrude(amount=40, mode=Mode.PRIVATE)
    chamfer3_piece_1 = chamfer3_piece_1 - Plane(origin=(-70, 0, -12.302715733), x_dir=(0.2500000000000009, -0.968245836551854, 0), z_dir=(0, 0, -1)) * Cylinder(4, 112, mode=Mode.PRIVATE)
    add(chamfer3_piece_1)
    with BuildSketch(Plane(origin=(-61, 20, 15), x_dir=(0.027495876610586487, 0, -0.9996219169112968), z_dir=(0, -1, 0))) as chamfer3_piece_2_section:
        Polygon((CHAMFER3_SIZE * 0.999621916911, -CHAMFER3_SIZE * 0.0274958766106), (-CHAMFER3_SIZE * 0.0274958766106, -CHAMFER3_SIZE * 0.999621916911), (0, 0), align=None)
    chamfer3_piece_2 = extrude(amount=40, mode=Mode.PRIVATE)
    chamfer3_piece_2 = chamfer3_piece_2 - Plane(origin=(-70, 0, 12.302715733), x_dir=(0.2500000000000009, -0.968245836551854, 0), z_dir=(0, 0, 1)) * Cylinder(4, 112, mode=Mode.PRIVATE)
    add(chamfer3_piece_2)
    with BuildSketch(Plane(origin=(21, 20, 15), x_dir=(0.9996219169112968, 0, 0.02749587661058627), z_dir=(0, -1, 0))) as chamfer3_piece_3:
        Polygon((CHAMFER3_SIZE * 0.999621916911, -CHAMFER3_SIZE * 0.0274958766106), (-CHAMFER3_SIZE * 0.0274958766106, -CHAMFER3_SIZE * 0.999621916911), (0, 0), align=None)
    extrude(amount=5)
    with BuildSketch(Plane(origin=(21, 20, -15), x_dir=(0.9996219169112968, 0, -0.02749587661058627), z_dir=(0, -1, 0))) as chamfer3_piece_4:
        Polygon((CHAMFER3_SIZE * 0.999621916911, CHAMFER3_SIZE * 0.0274958766106), (-CHAMFER3_SIZE * 0.0274958766106, CHAMFER3_SIZE * 0.999621916911), (0, 0), align=None)
    extrude(amount=5)

    # Fillet8
    fillet8_edges = [part.edges().sort_by_distance(p)[0] for p in [
        (-61, 0, -7),
        (-61, 0, 7),
        (21, 17.5, 7),
        (21, 17.5, -7),
    ]]
    fillet(fillet8_edges, radius=FILLET8_R)


solid = part.part
